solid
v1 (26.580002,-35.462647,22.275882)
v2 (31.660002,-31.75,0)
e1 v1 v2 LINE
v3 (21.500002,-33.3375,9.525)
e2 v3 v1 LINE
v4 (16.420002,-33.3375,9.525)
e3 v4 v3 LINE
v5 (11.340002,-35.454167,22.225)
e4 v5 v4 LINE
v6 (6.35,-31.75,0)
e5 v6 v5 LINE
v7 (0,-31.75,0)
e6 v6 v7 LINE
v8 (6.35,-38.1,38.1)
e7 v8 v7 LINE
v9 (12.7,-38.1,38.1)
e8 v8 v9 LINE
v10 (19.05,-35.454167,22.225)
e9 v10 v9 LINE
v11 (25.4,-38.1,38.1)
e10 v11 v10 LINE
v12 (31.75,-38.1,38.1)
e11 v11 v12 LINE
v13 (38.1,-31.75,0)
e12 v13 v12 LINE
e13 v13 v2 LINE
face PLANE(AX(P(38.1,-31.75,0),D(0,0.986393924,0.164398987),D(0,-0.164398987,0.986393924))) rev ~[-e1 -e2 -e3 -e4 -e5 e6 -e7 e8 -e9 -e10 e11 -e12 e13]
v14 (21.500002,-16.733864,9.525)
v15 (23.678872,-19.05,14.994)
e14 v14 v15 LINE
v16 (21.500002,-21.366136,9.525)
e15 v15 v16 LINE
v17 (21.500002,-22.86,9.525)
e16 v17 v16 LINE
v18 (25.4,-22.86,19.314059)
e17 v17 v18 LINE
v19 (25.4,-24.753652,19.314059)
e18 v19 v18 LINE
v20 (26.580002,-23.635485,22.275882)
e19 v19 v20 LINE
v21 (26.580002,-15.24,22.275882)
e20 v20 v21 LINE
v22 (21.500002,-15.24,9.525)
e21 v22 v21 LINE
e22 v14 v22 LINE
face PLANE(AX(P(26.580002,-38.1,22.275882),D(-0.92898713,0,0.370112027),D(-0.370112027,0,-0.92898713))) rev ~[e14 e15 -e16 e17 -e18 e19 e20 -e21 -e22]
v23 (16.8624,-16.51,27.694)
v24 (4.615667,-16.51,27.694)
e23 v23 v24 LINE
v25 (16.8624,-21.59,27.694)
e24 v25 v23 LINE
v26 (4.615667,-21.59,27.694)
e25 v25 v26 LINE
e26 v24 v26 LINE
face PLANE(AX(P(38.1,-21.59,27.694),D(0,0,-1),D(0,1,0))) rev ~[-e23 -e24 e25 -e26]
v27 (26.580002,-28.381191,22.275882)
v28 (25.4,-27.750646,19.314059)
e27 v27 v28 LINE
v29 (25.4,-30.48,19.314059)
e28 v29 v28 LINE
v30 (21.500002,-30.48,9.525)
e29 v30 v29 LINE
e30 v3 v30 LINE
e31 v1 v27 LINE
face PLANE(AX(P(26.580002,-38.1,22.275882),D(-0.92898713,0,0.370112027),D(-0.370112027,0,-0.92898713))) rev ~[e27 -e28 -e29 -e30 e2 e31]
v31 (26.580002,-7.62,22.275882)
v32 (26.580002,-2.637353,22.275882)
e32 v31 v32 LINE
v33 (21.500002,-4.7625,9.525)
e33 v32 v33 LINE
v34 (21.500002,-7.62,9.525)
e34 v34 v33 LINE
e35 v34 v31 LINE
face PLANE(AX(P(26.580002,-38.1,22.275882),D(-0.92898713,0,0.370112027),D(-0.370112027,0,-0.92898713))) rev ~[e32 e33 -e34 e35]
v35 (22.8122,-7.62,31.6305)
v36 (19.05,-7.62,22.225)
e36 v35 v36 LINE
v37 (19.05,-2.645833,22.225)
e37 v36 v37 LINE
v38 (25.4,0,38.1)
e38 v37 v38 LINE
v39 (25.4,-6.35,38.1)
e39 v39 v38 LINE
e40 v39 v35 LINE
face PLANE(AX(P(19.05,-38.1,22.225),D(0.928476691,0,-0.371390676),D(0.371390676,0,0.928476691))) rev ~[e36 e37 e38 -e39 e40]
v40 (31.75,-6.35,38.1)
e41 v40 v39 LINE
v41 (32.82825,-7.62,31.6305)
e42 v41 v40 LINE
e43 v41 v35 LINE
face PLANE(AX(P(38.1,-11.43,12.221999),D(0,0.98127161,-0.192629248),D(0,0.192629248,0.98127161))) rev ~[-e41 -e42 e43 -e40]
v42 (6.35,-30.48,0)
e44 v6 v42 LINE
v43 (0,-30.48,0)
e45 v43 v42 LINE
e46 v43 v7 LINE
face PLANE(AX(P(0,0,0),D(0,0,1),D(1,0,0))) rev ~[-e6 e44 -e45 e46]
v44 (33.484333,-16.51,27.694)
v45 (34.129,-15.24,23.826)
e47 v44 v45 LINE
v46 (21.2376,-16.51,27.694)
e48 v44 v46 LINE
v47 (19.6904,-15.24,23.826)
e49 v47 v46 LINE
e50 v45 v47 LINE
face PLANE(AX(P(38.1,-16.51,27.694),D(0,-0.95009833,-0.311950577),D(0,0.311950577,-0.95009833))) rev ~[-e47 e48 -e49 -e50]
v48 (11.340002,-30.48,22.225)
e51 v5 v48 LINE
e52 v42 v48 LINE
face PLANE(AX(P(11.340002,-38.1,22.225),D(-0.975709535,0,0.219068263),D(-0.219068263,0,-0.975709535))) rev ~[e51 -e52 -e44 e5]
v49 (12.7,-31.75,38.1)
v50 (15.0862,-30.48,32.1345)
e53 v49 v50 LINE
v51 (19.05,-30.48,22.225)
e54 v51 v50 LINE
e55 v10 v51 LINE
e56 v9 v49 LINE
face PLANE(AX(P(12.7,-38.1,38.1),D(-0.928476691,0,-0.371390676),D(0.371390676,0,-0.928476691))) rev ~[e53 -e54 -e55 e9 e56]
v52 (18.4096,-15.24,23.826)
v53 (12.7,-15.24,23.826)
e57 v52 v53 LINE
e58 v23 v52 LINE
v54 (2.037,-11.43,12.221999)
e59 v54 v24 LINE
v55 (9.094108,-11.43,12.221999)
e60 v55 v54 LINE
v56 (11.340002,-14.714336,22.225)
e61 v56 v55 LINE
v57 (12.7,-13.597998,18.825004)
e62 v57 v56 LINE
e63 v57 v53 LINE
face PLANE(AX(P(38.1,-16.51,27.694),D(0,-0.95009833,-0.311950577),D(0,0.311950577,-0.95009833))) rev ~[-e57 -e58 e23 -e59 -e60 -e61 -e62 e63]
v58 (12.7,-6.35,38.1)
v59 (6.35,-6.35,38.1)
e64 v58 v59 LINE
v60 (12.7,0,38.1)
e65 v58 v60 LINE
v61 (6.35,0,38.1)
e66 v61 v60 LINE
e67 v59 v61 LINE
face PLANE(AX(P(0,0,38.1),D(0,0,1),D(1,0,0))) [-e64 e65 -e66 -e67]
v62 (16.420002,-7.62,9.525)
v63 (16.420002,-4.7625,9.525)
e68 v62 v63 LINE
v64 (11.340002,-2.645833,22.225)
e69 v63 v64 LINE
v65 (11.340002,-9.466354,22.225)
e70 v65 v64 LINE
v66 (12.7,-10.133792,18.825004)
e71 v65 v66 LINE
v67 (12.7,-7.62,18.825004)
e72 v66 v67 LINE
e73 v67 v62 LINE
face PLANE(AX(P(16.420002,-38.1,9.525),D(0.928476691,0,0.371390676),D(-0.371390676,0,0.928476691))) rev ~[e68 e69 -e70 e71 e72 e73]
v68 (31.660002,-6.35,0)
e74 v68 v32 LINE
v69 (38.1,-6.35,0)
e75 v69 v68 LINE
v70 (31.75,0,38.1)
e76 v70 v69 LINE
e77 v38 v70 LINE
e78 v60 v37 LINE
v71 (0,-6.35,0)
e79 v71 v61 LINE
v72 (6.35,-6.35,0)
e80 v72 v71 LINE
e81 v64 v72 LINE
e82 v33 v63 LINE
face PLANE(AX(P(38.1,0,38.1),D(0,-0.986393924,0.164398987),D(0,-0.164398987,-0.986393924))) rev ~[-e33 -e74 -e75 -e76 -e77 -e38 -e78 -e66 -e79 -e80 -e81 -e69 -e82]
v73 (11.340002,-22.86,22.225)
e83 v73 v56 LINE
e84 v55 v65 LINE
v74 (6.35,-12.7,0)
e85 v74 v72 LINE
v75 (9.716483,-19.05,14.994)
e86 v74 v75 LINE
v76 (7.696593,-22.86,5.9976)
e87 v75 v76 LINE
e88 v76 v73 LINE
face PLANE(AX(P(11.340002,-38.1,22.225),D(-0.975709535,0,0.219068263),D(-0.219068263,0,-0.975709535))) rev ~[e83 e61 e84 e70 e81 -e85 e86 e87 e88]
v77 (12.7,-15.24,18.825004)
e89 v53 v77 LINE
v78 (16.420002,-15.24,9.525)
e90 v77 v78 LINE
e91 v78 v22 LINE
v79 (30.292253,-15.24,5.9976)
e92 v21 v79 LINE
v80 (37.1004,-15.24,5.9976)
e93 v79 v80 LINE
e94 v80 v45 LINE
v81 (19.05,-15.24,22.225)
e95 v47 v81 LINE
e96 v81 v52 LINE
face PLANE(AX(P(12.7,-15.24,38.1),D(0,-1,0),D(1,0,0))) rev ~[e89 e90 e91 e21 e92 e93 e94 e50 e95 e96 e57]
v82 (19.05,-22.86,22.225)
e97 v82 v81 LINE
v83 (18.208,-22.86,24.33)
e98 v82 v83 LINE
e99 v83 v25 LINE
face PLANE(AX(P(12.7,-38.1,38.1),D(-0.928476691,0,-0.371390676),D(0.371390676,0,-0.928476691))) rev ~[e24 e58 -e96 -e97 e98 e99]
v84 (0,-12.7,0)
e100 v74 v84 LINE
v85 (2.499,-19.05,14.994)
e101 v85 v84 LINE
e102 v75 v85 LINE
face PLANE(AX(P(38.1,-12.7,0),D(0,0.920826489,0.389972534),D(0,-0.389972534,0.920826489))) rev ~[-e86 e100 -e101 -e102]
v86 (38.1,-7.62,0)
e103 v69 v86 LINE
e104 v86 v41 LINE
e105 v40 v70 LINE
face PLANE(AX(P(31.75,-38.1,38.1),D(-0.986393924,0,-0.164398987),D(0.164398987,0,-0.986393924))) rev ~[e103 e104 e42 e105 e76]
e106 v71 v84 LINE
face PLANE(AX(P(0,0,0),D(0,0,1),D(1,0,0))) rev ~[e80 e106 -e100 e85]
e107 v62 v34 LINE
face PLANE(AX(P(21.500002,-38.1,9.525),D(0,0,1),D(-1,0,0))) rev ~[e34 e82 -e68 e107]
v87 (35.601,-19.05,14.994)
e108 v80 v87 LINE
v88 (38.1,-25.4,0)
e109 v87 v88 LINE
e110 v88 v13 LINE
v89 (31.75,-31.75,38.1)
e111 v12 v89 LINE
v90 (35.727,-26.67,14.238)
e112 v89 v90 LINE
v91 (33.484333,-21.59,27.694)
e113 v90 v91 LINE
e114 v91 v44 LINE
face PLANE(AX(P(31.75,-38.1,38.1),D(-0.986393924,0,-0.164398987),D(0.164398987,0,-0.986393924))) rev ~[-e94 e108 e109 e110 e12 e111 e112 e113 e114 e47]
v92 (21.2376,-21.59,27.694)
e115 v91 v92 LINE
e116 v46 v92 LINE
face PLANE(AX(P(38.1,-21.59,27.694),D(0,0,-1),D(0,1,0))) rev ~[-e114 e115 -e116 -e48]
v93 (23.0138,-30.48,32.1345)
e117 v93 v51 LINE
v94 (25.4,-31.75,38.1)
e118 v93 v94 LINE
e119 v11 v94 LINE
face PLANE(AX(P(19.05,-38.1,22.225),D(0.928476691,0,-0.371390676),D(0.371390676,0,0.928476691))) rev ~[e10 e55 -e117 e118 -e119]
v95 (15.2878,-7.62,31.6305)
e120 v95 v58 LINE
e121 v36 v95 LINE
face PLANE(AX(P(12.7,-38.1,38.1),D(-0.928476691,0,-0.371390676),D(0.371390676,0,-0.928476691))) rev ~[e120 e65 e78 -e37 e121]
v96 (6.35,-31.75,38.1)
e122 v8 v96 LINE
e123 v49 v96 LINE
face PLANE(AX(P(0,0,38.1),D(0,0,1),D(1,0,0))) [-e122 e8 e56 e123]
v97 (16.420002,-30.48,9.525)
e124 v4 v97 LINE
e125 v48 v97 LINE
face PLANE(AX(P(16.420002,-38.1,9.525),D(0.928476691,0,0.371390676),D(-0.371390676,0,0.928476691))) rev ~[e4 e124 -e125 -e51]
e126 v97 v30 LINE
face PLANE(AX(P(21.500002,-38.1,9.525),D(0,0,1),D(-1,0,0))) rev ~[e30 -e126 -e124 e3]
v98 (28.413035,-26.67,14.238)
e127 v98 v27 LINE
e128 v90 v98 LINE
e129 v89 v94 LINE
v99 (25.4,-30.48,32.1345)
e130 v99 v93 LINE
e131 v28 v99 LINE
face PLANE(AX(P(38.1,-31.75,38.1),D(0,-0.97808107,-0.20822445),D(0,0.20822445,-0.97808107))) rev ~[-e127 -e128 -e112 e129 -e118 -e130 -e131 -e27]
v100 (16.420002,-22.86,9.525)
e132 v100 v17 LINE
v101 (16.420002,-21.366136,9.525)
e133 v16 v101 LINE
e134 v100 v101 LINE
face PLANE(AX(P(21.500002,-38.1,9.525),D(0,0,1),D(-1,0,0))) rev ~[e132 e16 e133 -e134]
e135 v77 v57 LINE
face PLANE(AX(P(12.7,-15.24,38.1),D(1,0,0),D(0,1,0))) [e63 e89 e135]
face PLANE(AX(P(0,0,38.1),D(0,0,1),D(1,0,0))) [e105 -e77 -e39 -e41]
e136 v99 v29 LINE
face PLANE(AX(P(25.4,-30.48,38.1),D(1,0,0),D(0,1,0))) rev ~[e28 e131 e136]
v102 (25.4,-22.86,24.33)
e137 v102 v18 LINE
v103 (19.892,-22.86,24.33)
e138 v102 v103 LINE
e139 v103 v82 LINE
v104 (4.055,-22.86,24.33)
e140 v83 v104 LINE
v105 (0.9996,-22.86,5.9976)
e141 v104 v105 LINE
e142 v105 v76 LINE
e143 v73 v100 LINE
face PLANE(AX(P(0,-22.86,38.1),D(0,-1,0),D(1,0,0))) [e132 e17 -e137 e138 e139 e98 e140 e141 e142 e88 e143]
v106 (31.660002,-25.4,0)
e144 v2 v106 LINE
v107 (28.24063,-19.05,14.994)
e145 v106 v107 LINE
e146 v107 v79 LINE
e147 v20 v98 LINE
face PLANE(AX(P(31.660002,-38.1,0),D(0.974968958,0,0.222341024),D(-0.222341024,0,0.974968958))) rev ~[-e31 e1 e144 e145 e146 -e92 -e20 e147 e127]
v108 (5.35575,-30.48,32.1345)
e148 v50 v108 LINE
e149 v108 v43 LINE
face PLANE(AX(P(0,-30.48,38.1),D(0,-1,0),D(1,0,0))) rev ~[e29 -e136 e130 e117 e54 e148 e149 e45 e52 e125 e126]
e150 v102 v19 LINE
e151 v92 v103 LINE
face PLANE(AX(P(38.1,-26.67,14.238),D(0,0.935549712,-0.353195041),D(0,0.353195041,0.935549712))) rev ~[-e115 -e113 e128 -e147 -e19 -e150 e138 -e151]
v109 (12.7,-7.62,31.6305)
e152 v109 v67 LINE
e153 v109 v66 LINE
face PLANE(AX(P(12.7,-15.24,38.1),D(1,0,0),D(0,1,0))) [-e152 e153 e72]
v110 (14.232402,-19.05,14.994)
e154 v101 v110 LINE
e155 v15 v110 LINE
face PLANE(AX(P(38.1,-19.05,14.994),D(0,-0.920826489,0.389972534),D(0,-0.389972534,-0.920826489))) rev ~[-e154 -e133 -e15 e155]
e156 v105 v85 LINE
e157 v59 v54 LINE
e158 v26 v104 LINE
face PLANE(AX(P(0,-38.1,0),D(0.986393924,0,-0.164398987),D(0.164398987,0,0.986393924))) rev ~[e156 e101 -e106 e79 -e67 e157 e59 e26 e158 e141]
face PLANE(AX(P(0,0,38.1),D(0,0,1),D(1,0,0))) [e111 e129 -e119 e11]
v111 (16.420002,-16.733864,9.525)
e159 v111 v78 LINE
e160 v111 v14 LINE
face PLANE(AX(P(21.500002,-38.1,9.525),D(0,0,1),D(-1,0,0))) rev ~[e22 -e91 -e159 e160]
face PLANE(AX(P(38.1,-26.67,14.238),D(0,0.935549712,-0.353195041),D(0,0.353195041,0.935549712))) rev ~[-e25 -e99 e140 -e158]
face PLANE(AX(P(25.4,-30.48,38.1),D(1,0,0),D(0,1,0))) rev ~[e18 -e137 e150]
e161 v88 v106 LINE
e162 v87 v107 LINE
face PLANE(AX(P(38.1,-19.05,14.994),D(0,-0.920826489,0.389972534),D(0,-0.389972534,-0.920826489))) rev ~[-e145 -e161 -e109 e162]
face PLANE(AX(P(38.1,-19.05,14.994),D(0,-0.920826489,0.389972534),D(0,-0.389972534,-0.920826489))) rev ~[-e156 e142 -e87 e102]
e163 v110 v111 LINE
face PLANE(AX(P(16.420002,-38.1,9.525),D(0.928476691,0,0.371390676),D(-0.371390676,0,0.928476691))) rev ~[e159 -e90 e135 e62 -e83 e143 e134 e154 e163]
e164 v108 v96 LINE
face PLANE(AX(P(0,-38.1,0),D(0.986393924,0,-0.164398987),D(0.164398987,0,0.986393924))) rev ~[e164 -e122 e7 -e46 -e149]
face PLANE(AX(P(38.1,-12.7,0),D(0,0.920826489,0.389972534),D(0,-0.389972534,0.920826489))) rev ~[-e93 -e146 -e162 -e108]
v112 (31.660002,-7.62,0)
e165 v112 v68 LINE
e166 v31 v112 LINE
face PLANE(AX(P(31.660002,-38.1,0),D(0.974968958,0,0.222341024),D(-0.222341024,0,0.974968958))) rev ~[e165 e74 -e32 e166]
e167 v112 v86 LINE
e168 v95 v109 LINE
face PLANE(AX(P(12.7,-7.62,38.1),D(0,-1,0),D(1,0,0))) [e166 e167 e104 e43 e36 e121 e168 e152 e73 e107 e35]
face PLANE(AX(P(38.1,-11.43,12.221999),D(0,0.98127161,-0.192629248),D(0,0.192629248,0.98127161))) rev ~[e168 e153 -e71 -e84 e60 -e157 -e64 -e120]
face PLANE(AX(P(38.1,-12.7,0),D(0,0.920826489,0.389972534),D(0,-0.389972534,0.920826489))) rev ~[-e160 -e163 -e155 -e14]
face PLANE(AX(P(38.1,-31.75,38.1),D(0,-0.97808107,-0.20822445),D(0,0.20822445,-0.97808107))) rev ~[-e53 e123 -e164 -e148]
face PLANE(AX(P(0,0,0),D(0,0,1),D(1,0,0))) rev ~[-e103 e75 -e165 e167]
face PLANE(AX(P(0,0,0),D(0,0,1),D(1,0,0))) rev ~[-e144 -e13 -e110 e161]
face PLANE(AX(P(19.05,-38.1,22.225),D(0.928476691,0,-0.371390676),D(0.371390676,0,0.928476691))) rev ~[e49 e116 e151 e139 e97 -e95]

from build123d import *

# Parameters (mm, degrees)
F0_W      = 38.1
F0_H      = 38.1
F1_DEPTH  = 38.1
F6_DEPTH  = 38.1
F8_DEPTH  = 38.1
F9_W      = 25.4
F9_H      = 7.62
F10_DEPTH = 38.1


# Not quite as in the source:
# - a feature names something its author has since deleted; it is built from what else it names


with BuildPart() as f1:
    # F0 (on Front) → F1 (new body)
    with BuildSketch(Plane.XZ):
        with Locations((19.05, 19.05)):
            Rectangle(F0_W, F0_H)
    extrude(amount=F1_DEPTH)

    # F5 (on offset) → F6 (cut)
    with BuildSketch(Plane.YZ.offset(38.1)):
        Polygon((-11.43, 12.2219994664), (-6.35, 38.1), (-31.75, 38.1), (-26.67, 14.2379999161), (-21.59, 27.6940000847), (-16.51, 27.6940000847), align=None)
        Polygon((-31.75, 0), (-38.1, 38.1), (-38.1, 0), align=None)
        Polygon((-25.4, 0), (-19.05, 0), (-19.05, 14.9940000847), align=None)
        Polygon((-19.05, 0), (-12.7, 0), (-19.05, 14.9940000847), align=None)
        Polygon((-6.35, 0), (0, 0), (0, 38.1), align=None)
    extrude(amount=-F6_DEPTH, mode=Mode.SUBTRACT)

    # F7 (on offset) → F8 (cut)
    with BuildSketch(Plane.XZ.offset(38.1)):
        Polygon((0, 38.1), (0, 0), (6.35, 38.1), align=None)
        Polygon((25.4, 38.1), (12.7, 38.1), (19.05, 22.225), align=None)
        Polygon((31.75, 38.1), (38.1, 0), (38.1, 38.1), align=None)
        Polygon((11.340001598, 22.225), (6.35, 0), (31.660001598, 0), (26.580001598, 22.2758815411), (21.500001598, 9.525), (16.420001598, 9.525), align=None)
    extrude(amount=-F8_DEPTH, mode=Mode.SUBTRACT)

    # F9 (on offset) → F10 (cut)
    with BuildSketch(Plane.XY.offset(38.1)):
        with Locations((25.4, -11.43)):
            Rectangle(F9_W, F9_H)
        with Locations((12.7, -26.67)):
            Rectangle(F9_W, F9_H)
    extrude(amount=-F10_DEPTH, mode=Mode.SUBTRACT)


solid = f1.part
